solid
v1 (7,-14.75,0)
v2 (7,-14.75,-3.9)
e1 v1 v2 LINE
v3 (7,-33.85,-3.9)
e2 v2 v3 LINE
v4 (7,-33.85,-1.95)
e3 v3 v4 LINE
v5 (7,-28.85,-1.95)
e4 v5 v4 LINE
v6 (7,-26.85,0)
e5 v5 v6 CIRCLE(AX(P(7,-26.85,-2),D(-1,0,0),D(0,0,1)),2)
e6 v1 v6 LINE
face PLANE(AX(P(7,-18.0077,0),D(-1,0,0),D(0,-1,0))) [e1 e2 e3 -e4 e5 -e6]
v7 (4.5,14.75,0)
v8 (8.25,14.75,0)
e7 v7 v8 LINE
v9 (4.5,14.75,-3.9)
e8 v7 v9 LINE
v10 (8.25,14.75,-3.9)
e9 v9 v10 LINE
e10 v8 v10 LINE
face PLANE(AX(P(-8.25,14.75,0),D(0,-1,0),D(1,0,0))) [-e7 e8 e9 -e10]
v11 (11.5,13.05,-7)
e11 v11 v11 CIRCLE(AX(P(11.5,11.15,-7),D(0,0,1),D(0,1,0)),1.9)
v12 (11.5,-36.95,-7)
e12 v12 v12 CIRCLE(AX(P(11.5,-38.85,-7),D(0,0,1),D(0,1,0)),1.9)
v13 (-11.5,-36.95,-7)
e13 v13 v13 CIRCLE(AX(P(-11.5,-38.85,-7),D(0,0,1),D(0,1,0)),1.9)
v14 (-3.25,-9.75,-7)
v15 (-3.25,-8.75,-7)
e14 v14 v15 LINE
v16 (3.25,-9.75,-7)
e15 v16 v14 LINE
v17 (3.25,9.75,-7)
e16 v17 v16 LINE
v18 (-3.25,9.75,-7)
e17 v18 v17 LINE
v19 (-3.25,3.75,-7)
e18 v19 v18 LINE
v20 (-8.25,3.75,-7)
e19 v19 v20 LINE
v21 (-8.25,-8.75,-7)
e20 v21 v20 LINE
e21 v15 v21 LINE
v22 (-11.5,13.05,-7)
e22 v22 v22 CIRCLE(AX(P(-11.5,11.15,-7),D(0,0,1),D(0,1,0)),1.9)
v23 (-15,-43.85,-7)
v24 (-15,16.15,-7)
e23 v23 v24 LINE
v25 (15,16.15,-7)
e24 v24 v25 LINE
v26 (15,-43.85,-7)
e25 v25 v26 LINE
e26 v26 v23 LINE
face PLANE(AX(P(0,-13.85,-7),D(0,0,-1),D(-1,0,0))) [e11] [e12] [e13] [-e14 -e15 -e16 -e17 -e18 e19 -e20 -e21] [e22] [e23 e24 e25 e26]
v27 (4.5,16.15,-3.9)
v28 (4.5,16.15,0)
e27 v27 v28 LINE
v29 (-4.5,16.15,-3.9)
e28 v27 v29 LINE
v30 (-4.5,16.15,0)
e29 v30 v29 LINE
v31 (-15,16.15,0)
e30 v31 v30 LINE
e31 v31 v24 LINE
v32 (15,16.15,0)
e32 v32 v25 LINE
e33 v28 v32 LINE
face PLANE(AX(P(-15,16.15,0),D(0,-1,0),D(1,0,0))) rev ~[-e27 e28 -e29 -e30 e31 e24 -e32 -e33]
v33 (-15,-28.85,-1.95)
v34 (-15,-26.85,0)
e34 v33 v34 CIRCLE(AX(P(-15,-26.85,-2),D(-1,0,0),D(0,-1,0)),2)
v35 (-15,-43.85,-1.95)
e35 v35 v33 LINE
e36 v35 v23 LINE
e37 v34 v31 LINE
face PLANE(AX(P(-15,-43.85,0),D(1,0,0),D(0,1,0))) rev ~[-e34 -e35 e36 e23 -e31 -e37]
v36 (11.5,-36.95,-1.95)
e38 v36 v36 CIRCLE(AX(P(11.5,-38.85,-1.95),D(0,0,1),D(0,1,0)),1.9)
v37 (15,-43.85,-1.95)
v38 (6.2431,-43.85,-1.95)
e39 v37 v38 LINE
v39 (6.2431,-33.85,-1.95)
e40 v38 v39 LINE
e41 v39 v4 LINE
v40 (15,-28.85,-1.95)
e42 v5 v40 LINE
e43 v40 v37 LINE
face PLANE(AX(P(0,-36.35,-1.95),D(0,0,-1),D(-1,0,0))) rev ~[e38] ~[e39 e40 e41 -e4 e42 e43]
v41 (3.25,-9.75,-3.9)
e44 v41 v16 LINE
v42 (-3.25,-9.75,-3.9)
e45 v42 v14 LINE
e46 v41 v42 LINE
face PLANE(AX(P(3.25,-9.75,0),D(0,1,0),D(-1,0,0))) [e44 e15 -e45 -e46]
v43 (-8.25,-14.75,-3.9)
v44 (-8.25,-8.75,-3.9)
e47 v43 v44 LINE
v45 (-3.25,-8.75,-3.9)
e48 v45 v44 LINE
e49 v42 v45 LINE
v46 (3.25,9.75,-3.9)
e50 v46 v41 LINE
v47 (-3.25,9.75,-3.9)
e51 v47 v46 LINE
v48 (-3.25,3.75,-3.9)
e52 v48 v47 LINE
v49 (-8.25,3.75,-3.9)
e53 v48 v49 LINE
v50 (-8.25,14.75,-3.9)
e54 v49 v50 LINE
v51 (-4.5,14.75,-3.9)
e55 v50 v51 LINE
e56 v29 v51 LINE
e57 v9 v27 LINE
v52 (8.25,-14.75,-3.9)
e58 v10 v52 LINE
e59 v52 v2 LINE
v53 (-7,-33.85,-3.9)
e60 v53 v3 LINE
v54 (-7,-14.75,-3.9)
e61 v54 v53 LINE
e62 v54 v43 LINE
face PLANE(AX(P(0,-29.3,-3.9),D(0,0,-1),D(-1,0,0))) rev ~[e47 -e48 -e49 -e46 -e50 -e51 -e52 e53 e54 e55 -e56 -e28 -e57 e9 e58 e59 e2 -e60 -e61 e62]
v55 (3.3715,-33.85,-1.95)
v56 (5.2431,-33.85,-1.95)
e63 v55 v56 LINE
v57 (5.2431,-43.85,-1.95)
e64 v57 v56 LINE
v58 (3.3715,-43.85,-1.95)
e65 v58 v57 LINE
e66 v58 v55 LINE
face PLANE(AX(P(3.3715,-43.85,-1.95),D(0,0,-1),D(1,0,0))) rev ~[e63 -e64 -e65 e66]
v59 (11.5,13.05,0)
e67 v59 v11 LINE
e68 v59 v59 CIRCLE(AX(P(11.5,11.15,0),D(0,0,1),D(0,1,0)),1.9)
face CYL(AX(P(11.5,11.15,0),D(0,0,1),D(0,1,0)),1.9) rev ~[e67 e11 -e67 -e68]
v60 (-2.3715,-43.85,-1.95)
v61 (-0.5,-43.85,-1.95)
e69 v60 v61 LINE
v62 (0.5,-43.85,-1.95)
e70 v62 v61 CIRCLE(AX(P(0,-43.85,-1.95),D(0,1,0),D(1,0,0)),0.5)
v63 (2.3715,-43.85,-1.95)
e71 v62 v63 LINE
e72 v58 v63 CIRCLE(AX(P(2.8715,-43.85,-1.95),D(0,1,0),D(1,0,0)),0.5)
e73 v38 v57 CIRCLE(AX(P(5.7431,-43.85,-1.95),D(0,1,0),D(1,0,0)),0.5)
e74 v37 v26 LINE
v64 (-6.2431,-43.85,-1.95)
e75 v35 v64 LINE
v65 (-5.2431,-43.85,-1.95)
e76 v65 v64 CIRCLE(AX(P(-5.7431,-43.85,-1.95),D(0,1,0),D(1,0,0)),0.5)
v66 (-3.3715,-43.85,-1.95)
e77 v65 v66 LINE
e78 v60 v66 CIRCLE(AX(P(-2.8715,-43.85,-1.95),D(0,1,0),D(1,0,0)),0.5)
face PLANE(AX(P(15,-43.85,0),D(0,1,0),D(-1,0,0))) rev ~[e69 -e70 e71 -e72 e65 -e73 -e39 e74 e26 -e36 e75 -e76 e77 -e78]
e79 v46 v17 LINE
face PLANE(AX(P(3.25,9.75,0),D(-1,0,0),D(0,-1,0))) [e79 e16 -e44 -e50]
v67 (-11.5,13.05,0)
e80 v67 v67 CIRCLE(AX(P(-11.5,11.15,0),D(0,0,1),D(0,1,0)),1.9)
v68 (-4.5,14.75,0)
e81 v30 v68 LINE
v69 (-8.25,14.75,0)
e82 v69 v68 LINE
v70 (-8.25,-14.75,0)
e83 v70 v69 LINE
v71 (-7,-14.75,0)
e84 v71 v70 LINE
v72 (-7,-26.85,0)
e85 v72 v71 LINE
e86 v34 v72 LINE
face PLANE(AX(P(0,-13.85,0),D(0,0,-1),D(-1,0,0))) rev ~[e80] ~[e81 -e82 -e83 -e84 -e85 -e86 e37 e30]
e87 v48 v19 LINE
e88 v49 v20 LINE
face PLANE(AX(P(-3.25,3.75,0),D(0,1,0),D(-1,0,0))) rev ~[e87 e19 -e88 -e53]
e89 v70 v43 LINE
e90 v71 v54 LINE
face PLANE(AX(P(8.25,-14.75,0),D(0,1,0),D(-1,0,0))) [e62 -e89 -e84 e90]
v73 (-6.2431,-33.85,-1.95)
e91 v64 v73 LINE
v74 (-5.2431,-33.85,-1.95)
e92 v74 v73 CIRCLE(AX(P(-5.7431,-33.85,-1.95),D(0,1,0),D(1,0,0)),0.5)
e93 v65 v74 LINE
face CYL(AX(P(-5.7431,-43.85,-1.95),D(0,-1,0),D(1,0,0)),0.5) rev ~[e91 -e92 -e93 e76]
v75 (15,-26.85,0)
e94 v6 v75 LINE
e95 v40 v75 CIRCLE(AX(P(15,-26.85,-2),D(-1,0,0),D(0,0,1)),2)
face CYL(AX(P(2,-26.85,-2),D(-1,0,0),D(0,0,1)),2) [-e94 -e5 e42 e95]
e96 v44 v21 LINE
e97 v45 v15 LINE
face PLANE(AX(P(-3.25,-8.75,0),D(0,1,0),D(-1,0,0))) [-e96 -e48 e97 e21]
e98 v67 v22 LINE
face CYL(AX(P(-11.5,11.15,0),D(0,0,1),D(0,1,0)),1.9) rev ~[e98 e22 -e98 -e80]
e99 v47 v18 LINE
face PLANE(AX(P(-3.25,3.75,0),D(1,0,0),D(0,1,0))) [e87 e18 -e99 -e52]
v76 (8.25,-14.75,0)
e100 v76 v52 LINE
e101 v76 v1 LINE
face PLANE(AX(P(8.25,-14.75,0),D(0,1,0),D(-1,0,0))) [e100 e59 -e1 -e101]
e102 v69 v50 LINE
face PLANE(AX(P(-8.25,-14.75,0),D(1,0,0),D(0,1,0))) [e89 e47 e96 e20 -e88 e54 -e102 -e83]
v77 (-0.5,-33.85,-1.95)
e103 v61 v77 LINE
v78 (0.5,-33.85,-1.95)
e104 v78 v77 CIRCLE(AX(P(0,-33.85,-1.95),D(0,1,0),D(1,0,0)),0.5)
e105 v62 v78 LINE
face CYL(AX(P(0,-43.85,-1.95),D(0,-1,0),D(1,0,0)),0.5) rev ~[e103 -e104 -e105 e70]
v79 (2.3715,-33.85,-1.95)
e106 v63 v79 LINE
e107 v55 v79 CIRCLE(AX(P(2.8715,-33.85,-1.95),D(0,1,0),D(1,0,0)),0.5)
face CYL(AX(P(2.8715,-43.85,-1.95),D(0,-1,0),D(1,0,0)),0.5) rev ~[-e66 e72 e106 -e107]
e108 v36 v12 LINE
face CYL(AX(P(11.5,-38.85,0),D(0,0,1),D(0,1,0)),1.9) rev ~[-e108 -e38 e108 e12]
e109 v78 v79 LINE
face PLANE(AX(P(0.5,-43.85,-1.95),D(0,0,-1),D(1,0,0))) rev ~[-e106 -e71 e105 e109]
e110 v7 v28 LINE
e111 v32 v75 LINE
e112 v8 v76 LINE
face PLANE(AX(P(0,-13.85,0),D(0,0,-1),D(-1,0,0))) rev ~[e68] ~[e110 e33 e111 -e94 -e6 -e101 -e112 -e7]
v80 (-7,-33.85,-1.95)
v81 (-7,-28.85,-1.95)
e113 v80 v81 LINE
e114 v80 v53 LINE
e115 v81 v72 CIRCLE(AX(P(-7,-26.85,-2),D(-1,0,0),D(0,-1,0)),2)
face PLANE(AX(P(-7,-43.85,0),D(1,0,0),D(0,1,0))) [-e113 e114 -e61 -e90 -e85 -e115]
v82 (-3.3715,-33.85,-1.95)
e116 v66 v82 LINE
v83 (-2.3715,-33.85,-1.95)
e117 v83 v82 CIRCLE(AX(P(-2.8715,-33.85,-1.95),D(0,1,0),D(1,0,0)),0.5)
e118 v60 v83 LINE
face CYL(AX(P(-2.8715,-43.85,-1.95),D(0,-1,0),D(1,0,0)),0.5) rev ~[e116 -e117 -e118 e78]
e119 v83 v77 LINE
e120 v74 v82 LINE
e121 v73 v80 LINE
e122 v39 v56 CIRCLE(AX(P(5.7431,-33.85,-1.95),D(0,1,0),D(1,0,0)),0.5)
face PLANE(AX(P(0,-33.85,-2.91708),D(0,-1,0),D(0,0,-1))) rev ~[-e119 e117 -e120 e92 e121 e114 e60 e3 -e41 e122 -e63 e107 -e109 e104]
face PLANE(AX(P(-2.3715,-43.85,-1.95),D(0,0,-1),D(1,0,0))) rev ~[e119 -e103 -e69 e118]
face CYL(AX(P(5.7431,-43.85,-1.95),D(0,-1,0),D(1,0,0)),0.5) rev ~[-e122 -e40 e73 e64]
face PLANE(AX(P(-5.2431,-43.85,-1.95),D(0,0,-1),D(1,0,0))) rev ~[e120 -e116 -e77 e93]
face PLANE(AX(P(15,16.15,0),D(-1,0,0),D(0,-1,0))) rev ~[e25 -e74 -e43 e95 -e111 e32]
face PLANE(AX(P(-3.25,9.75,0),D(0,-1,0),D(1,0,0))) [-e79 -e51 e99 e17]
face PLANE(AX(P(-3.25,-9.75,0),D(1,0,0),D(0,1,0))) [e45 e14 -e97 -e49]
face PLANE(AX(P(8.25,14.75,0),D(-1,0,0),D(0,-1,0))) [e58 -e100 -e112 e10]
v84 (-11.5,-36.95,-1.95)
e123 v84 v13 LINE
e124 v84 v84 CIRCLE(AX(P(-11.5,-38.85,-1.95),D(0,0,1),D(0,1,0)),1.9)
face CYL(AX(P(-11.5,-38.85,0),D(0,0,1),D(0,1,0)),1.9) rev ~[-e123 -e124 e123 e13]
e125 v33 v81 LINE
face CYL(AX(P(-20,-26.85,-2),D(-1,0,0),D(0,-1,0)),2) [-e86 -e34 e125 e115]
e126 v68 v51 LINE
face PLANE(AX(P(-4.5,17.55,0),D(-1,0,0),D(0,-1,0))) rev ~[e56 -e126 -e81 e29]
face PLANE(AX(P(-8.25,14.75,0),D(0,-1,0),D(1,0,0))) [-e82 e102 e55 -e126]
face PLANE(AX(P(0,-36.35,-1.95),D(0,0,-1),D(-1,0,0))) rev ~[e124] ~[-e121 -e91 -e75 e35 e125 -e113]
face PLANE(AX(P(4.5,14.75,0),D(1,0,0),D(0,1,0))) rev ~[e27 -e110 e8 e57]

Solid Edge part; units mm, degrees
sketch "Sketch1" plane through (0, 0, 0) normal (0, 0, 1) x (1, 0, 0)
  line L0 (-15, -43.85) -> (-15, 16.15)
  line L1 (-15, 16.15) -> (15, 16.15)
  line L2 (15, 16.15) -> (15, -43.85)
  line L3 (15, -43.85) -> (-15, -43.85)
extrude "Protrusion1" add sketch "Sketch1" against normal blind 7
sketch "Sketch2" plane through (0, 0, 0) normal (0, 0, 1) x (1, 0, 0)
  line L0 (8.25, -14.75) -> (-8.25, -14.75)
  line L1 (-8.25, -14.75) -> (-8.25, 14.75)
  line L2 (-8.25, 14.75) -> (8.25, 14.75)
  line L3 (8.25, 14.75) -> (8.25, -14.75)
extrude "ExtrudedCutout_1" cut sketch "Sketch2" against normal blind 3.9
sketch "Sketch3" plane through (0, -13.85, 0) normal (0, 0, 1) x (1, 0, 0)
  line L0 (3.25, 4.1) -> (-3.25, 4.1)
  line L1 (-3.25, 4.1) -> (-3.25, 5.1)
  line L2 (-3.25, 5.1) -> (-8.25, 5.1)
  line L3 (-8.25, 5.1) -> (-8.25, 17.6)
  line L4 (-3.25, 17.6) -> (-8.25, 17.6)
  line L5 (-3.25, 17.6) -> (-3.25, 23.6)
  line L6 (-3.25, 23.6) -> (3.25, 23.6)
  line L7 (3.25, 23.6) -> (3.25, 4.1)
extrude "Cutout1" cut sketch "Sketch3" against normal up to next
sketch "Sketch4" plane through (0, -13.85, 0) normal (0, 0, 1) x (1, 0, 0)
  line L0 (4.5, 31.4) -> (-4.5, 31.4)
  line L1 (-4.5, 31.4) -> (-4.5, 28.6)
  line L2 (-4.5, 28.6) -> (4.5, 28.6)
  line L3 (4.5, 28.6) -> (4.5, 31.4)
extrude "Cutout2" cut sketch "Sketch4" against normal up to vertex (3.9 mm away)
sketch "Sketch5" plane through (0, -13.85, 0) normal (0, 0, 1) x (1, 0, 0)
  line L0 (7, -4.1577) -> (7, -30)
  line L1 (7, -30) -> (-7, -30)
  line L2 (-7, -30) -> (-7, -4.1577)
  line L3 (-7, -4.1577) -> (-7, -0.9)
  line L4 (-7, -0.9) -> (7, -0.9)
  line L5 (7, -0.9) -> (7, -4.1577)
extrude "Cutout3" cut sketch "Sketch5" against normal up to vertex (3.9 mm away)
sketch "Sketch6" plane through (0, -43.85, -3.5) normal (0, -1, 0) x (1, 0, 0)
  line L0 (-6.2431, 1.55) -> (-7, 1.55)
  line L1 (-7, 1.55) -> (-7, -0.4)
  line L2 (-7, -0.4) -> (7, -0.4)
  line L3 (7, -0.4) -> (7, 1.55)
  line L4 (6.2431, 1.55) -> (7, 1.55)
  line L5 (3.3715, 1.55) -> (5.2431, 1.55)
  line L6 (0.5, 1.55) -> (2.3715, 1.55)
  line L7 (-2.3715, 1.55) -> (-0.5, 1.55)
  line L8 (-5.2431, 1.55) -> (-3.3715, 1.55)
  arc A0 (6.2431, 1.55) -> (5.2431, 1.55) centre (5.7431, 1.55) cw
  arc A1 (3.3715, 1.55) -> (2.3715, 1.55) centre (2.8715, 1.55) cw
  arc A2 (0.5, 1.55) -> (-0.5, 1.55) centre (0, 1.55) cw
  arc A3 (-2.3715, 1.55) -> (-3.3715, 1.55) centre (-2.8715, 1.55) cw
  arc A4 (-5.2431, 1.55) -> (-6.2431, 1.55) centre (-5.7431, 1.55) cw
extrude "ExtrudedProtrusion_2" add sketch "Sketch6" against normal blind 10
sketch "Sketch7" plane through (-8.9522, -13.85, 0) normal (0, 0, 1) x (0, 1, 0)
  circle A0 centre (-25, 2.5478) radius 1.9
  circle A1 centre (-25, -20.4522) radius 1.9
  circle A2 centre (25, 2.5478) radius 1.9
  circle A3 centre (25, -20.4522) radius 1.9
  dimension "D1" = 23
  dimension "D2" = 50
extrude "Cutout4" cut sketch "Sketch7" against normal up to next
sketch "Sketch8" plane through (9.75, -13.85, 0) normal (0, 0, 1) x (0, 1, 0)
  line L0 (-15, 24.75) -> (-15, -5.25)
  line L1 (-15, -5.25) -> (-30, -5.25)
  line L2 (-30, -5.25) -> (-30, 24.75)
  line L3 (-30, 24.75) -> (-15, 24.75)
extrude "Cutout5" cut sketch "Sketch8" against normal up to vertex (1.95 mm away)
fillet "Round_1" radius 2 2 edges at (-11, -28.85, 0) (11, -28.85, 0)
